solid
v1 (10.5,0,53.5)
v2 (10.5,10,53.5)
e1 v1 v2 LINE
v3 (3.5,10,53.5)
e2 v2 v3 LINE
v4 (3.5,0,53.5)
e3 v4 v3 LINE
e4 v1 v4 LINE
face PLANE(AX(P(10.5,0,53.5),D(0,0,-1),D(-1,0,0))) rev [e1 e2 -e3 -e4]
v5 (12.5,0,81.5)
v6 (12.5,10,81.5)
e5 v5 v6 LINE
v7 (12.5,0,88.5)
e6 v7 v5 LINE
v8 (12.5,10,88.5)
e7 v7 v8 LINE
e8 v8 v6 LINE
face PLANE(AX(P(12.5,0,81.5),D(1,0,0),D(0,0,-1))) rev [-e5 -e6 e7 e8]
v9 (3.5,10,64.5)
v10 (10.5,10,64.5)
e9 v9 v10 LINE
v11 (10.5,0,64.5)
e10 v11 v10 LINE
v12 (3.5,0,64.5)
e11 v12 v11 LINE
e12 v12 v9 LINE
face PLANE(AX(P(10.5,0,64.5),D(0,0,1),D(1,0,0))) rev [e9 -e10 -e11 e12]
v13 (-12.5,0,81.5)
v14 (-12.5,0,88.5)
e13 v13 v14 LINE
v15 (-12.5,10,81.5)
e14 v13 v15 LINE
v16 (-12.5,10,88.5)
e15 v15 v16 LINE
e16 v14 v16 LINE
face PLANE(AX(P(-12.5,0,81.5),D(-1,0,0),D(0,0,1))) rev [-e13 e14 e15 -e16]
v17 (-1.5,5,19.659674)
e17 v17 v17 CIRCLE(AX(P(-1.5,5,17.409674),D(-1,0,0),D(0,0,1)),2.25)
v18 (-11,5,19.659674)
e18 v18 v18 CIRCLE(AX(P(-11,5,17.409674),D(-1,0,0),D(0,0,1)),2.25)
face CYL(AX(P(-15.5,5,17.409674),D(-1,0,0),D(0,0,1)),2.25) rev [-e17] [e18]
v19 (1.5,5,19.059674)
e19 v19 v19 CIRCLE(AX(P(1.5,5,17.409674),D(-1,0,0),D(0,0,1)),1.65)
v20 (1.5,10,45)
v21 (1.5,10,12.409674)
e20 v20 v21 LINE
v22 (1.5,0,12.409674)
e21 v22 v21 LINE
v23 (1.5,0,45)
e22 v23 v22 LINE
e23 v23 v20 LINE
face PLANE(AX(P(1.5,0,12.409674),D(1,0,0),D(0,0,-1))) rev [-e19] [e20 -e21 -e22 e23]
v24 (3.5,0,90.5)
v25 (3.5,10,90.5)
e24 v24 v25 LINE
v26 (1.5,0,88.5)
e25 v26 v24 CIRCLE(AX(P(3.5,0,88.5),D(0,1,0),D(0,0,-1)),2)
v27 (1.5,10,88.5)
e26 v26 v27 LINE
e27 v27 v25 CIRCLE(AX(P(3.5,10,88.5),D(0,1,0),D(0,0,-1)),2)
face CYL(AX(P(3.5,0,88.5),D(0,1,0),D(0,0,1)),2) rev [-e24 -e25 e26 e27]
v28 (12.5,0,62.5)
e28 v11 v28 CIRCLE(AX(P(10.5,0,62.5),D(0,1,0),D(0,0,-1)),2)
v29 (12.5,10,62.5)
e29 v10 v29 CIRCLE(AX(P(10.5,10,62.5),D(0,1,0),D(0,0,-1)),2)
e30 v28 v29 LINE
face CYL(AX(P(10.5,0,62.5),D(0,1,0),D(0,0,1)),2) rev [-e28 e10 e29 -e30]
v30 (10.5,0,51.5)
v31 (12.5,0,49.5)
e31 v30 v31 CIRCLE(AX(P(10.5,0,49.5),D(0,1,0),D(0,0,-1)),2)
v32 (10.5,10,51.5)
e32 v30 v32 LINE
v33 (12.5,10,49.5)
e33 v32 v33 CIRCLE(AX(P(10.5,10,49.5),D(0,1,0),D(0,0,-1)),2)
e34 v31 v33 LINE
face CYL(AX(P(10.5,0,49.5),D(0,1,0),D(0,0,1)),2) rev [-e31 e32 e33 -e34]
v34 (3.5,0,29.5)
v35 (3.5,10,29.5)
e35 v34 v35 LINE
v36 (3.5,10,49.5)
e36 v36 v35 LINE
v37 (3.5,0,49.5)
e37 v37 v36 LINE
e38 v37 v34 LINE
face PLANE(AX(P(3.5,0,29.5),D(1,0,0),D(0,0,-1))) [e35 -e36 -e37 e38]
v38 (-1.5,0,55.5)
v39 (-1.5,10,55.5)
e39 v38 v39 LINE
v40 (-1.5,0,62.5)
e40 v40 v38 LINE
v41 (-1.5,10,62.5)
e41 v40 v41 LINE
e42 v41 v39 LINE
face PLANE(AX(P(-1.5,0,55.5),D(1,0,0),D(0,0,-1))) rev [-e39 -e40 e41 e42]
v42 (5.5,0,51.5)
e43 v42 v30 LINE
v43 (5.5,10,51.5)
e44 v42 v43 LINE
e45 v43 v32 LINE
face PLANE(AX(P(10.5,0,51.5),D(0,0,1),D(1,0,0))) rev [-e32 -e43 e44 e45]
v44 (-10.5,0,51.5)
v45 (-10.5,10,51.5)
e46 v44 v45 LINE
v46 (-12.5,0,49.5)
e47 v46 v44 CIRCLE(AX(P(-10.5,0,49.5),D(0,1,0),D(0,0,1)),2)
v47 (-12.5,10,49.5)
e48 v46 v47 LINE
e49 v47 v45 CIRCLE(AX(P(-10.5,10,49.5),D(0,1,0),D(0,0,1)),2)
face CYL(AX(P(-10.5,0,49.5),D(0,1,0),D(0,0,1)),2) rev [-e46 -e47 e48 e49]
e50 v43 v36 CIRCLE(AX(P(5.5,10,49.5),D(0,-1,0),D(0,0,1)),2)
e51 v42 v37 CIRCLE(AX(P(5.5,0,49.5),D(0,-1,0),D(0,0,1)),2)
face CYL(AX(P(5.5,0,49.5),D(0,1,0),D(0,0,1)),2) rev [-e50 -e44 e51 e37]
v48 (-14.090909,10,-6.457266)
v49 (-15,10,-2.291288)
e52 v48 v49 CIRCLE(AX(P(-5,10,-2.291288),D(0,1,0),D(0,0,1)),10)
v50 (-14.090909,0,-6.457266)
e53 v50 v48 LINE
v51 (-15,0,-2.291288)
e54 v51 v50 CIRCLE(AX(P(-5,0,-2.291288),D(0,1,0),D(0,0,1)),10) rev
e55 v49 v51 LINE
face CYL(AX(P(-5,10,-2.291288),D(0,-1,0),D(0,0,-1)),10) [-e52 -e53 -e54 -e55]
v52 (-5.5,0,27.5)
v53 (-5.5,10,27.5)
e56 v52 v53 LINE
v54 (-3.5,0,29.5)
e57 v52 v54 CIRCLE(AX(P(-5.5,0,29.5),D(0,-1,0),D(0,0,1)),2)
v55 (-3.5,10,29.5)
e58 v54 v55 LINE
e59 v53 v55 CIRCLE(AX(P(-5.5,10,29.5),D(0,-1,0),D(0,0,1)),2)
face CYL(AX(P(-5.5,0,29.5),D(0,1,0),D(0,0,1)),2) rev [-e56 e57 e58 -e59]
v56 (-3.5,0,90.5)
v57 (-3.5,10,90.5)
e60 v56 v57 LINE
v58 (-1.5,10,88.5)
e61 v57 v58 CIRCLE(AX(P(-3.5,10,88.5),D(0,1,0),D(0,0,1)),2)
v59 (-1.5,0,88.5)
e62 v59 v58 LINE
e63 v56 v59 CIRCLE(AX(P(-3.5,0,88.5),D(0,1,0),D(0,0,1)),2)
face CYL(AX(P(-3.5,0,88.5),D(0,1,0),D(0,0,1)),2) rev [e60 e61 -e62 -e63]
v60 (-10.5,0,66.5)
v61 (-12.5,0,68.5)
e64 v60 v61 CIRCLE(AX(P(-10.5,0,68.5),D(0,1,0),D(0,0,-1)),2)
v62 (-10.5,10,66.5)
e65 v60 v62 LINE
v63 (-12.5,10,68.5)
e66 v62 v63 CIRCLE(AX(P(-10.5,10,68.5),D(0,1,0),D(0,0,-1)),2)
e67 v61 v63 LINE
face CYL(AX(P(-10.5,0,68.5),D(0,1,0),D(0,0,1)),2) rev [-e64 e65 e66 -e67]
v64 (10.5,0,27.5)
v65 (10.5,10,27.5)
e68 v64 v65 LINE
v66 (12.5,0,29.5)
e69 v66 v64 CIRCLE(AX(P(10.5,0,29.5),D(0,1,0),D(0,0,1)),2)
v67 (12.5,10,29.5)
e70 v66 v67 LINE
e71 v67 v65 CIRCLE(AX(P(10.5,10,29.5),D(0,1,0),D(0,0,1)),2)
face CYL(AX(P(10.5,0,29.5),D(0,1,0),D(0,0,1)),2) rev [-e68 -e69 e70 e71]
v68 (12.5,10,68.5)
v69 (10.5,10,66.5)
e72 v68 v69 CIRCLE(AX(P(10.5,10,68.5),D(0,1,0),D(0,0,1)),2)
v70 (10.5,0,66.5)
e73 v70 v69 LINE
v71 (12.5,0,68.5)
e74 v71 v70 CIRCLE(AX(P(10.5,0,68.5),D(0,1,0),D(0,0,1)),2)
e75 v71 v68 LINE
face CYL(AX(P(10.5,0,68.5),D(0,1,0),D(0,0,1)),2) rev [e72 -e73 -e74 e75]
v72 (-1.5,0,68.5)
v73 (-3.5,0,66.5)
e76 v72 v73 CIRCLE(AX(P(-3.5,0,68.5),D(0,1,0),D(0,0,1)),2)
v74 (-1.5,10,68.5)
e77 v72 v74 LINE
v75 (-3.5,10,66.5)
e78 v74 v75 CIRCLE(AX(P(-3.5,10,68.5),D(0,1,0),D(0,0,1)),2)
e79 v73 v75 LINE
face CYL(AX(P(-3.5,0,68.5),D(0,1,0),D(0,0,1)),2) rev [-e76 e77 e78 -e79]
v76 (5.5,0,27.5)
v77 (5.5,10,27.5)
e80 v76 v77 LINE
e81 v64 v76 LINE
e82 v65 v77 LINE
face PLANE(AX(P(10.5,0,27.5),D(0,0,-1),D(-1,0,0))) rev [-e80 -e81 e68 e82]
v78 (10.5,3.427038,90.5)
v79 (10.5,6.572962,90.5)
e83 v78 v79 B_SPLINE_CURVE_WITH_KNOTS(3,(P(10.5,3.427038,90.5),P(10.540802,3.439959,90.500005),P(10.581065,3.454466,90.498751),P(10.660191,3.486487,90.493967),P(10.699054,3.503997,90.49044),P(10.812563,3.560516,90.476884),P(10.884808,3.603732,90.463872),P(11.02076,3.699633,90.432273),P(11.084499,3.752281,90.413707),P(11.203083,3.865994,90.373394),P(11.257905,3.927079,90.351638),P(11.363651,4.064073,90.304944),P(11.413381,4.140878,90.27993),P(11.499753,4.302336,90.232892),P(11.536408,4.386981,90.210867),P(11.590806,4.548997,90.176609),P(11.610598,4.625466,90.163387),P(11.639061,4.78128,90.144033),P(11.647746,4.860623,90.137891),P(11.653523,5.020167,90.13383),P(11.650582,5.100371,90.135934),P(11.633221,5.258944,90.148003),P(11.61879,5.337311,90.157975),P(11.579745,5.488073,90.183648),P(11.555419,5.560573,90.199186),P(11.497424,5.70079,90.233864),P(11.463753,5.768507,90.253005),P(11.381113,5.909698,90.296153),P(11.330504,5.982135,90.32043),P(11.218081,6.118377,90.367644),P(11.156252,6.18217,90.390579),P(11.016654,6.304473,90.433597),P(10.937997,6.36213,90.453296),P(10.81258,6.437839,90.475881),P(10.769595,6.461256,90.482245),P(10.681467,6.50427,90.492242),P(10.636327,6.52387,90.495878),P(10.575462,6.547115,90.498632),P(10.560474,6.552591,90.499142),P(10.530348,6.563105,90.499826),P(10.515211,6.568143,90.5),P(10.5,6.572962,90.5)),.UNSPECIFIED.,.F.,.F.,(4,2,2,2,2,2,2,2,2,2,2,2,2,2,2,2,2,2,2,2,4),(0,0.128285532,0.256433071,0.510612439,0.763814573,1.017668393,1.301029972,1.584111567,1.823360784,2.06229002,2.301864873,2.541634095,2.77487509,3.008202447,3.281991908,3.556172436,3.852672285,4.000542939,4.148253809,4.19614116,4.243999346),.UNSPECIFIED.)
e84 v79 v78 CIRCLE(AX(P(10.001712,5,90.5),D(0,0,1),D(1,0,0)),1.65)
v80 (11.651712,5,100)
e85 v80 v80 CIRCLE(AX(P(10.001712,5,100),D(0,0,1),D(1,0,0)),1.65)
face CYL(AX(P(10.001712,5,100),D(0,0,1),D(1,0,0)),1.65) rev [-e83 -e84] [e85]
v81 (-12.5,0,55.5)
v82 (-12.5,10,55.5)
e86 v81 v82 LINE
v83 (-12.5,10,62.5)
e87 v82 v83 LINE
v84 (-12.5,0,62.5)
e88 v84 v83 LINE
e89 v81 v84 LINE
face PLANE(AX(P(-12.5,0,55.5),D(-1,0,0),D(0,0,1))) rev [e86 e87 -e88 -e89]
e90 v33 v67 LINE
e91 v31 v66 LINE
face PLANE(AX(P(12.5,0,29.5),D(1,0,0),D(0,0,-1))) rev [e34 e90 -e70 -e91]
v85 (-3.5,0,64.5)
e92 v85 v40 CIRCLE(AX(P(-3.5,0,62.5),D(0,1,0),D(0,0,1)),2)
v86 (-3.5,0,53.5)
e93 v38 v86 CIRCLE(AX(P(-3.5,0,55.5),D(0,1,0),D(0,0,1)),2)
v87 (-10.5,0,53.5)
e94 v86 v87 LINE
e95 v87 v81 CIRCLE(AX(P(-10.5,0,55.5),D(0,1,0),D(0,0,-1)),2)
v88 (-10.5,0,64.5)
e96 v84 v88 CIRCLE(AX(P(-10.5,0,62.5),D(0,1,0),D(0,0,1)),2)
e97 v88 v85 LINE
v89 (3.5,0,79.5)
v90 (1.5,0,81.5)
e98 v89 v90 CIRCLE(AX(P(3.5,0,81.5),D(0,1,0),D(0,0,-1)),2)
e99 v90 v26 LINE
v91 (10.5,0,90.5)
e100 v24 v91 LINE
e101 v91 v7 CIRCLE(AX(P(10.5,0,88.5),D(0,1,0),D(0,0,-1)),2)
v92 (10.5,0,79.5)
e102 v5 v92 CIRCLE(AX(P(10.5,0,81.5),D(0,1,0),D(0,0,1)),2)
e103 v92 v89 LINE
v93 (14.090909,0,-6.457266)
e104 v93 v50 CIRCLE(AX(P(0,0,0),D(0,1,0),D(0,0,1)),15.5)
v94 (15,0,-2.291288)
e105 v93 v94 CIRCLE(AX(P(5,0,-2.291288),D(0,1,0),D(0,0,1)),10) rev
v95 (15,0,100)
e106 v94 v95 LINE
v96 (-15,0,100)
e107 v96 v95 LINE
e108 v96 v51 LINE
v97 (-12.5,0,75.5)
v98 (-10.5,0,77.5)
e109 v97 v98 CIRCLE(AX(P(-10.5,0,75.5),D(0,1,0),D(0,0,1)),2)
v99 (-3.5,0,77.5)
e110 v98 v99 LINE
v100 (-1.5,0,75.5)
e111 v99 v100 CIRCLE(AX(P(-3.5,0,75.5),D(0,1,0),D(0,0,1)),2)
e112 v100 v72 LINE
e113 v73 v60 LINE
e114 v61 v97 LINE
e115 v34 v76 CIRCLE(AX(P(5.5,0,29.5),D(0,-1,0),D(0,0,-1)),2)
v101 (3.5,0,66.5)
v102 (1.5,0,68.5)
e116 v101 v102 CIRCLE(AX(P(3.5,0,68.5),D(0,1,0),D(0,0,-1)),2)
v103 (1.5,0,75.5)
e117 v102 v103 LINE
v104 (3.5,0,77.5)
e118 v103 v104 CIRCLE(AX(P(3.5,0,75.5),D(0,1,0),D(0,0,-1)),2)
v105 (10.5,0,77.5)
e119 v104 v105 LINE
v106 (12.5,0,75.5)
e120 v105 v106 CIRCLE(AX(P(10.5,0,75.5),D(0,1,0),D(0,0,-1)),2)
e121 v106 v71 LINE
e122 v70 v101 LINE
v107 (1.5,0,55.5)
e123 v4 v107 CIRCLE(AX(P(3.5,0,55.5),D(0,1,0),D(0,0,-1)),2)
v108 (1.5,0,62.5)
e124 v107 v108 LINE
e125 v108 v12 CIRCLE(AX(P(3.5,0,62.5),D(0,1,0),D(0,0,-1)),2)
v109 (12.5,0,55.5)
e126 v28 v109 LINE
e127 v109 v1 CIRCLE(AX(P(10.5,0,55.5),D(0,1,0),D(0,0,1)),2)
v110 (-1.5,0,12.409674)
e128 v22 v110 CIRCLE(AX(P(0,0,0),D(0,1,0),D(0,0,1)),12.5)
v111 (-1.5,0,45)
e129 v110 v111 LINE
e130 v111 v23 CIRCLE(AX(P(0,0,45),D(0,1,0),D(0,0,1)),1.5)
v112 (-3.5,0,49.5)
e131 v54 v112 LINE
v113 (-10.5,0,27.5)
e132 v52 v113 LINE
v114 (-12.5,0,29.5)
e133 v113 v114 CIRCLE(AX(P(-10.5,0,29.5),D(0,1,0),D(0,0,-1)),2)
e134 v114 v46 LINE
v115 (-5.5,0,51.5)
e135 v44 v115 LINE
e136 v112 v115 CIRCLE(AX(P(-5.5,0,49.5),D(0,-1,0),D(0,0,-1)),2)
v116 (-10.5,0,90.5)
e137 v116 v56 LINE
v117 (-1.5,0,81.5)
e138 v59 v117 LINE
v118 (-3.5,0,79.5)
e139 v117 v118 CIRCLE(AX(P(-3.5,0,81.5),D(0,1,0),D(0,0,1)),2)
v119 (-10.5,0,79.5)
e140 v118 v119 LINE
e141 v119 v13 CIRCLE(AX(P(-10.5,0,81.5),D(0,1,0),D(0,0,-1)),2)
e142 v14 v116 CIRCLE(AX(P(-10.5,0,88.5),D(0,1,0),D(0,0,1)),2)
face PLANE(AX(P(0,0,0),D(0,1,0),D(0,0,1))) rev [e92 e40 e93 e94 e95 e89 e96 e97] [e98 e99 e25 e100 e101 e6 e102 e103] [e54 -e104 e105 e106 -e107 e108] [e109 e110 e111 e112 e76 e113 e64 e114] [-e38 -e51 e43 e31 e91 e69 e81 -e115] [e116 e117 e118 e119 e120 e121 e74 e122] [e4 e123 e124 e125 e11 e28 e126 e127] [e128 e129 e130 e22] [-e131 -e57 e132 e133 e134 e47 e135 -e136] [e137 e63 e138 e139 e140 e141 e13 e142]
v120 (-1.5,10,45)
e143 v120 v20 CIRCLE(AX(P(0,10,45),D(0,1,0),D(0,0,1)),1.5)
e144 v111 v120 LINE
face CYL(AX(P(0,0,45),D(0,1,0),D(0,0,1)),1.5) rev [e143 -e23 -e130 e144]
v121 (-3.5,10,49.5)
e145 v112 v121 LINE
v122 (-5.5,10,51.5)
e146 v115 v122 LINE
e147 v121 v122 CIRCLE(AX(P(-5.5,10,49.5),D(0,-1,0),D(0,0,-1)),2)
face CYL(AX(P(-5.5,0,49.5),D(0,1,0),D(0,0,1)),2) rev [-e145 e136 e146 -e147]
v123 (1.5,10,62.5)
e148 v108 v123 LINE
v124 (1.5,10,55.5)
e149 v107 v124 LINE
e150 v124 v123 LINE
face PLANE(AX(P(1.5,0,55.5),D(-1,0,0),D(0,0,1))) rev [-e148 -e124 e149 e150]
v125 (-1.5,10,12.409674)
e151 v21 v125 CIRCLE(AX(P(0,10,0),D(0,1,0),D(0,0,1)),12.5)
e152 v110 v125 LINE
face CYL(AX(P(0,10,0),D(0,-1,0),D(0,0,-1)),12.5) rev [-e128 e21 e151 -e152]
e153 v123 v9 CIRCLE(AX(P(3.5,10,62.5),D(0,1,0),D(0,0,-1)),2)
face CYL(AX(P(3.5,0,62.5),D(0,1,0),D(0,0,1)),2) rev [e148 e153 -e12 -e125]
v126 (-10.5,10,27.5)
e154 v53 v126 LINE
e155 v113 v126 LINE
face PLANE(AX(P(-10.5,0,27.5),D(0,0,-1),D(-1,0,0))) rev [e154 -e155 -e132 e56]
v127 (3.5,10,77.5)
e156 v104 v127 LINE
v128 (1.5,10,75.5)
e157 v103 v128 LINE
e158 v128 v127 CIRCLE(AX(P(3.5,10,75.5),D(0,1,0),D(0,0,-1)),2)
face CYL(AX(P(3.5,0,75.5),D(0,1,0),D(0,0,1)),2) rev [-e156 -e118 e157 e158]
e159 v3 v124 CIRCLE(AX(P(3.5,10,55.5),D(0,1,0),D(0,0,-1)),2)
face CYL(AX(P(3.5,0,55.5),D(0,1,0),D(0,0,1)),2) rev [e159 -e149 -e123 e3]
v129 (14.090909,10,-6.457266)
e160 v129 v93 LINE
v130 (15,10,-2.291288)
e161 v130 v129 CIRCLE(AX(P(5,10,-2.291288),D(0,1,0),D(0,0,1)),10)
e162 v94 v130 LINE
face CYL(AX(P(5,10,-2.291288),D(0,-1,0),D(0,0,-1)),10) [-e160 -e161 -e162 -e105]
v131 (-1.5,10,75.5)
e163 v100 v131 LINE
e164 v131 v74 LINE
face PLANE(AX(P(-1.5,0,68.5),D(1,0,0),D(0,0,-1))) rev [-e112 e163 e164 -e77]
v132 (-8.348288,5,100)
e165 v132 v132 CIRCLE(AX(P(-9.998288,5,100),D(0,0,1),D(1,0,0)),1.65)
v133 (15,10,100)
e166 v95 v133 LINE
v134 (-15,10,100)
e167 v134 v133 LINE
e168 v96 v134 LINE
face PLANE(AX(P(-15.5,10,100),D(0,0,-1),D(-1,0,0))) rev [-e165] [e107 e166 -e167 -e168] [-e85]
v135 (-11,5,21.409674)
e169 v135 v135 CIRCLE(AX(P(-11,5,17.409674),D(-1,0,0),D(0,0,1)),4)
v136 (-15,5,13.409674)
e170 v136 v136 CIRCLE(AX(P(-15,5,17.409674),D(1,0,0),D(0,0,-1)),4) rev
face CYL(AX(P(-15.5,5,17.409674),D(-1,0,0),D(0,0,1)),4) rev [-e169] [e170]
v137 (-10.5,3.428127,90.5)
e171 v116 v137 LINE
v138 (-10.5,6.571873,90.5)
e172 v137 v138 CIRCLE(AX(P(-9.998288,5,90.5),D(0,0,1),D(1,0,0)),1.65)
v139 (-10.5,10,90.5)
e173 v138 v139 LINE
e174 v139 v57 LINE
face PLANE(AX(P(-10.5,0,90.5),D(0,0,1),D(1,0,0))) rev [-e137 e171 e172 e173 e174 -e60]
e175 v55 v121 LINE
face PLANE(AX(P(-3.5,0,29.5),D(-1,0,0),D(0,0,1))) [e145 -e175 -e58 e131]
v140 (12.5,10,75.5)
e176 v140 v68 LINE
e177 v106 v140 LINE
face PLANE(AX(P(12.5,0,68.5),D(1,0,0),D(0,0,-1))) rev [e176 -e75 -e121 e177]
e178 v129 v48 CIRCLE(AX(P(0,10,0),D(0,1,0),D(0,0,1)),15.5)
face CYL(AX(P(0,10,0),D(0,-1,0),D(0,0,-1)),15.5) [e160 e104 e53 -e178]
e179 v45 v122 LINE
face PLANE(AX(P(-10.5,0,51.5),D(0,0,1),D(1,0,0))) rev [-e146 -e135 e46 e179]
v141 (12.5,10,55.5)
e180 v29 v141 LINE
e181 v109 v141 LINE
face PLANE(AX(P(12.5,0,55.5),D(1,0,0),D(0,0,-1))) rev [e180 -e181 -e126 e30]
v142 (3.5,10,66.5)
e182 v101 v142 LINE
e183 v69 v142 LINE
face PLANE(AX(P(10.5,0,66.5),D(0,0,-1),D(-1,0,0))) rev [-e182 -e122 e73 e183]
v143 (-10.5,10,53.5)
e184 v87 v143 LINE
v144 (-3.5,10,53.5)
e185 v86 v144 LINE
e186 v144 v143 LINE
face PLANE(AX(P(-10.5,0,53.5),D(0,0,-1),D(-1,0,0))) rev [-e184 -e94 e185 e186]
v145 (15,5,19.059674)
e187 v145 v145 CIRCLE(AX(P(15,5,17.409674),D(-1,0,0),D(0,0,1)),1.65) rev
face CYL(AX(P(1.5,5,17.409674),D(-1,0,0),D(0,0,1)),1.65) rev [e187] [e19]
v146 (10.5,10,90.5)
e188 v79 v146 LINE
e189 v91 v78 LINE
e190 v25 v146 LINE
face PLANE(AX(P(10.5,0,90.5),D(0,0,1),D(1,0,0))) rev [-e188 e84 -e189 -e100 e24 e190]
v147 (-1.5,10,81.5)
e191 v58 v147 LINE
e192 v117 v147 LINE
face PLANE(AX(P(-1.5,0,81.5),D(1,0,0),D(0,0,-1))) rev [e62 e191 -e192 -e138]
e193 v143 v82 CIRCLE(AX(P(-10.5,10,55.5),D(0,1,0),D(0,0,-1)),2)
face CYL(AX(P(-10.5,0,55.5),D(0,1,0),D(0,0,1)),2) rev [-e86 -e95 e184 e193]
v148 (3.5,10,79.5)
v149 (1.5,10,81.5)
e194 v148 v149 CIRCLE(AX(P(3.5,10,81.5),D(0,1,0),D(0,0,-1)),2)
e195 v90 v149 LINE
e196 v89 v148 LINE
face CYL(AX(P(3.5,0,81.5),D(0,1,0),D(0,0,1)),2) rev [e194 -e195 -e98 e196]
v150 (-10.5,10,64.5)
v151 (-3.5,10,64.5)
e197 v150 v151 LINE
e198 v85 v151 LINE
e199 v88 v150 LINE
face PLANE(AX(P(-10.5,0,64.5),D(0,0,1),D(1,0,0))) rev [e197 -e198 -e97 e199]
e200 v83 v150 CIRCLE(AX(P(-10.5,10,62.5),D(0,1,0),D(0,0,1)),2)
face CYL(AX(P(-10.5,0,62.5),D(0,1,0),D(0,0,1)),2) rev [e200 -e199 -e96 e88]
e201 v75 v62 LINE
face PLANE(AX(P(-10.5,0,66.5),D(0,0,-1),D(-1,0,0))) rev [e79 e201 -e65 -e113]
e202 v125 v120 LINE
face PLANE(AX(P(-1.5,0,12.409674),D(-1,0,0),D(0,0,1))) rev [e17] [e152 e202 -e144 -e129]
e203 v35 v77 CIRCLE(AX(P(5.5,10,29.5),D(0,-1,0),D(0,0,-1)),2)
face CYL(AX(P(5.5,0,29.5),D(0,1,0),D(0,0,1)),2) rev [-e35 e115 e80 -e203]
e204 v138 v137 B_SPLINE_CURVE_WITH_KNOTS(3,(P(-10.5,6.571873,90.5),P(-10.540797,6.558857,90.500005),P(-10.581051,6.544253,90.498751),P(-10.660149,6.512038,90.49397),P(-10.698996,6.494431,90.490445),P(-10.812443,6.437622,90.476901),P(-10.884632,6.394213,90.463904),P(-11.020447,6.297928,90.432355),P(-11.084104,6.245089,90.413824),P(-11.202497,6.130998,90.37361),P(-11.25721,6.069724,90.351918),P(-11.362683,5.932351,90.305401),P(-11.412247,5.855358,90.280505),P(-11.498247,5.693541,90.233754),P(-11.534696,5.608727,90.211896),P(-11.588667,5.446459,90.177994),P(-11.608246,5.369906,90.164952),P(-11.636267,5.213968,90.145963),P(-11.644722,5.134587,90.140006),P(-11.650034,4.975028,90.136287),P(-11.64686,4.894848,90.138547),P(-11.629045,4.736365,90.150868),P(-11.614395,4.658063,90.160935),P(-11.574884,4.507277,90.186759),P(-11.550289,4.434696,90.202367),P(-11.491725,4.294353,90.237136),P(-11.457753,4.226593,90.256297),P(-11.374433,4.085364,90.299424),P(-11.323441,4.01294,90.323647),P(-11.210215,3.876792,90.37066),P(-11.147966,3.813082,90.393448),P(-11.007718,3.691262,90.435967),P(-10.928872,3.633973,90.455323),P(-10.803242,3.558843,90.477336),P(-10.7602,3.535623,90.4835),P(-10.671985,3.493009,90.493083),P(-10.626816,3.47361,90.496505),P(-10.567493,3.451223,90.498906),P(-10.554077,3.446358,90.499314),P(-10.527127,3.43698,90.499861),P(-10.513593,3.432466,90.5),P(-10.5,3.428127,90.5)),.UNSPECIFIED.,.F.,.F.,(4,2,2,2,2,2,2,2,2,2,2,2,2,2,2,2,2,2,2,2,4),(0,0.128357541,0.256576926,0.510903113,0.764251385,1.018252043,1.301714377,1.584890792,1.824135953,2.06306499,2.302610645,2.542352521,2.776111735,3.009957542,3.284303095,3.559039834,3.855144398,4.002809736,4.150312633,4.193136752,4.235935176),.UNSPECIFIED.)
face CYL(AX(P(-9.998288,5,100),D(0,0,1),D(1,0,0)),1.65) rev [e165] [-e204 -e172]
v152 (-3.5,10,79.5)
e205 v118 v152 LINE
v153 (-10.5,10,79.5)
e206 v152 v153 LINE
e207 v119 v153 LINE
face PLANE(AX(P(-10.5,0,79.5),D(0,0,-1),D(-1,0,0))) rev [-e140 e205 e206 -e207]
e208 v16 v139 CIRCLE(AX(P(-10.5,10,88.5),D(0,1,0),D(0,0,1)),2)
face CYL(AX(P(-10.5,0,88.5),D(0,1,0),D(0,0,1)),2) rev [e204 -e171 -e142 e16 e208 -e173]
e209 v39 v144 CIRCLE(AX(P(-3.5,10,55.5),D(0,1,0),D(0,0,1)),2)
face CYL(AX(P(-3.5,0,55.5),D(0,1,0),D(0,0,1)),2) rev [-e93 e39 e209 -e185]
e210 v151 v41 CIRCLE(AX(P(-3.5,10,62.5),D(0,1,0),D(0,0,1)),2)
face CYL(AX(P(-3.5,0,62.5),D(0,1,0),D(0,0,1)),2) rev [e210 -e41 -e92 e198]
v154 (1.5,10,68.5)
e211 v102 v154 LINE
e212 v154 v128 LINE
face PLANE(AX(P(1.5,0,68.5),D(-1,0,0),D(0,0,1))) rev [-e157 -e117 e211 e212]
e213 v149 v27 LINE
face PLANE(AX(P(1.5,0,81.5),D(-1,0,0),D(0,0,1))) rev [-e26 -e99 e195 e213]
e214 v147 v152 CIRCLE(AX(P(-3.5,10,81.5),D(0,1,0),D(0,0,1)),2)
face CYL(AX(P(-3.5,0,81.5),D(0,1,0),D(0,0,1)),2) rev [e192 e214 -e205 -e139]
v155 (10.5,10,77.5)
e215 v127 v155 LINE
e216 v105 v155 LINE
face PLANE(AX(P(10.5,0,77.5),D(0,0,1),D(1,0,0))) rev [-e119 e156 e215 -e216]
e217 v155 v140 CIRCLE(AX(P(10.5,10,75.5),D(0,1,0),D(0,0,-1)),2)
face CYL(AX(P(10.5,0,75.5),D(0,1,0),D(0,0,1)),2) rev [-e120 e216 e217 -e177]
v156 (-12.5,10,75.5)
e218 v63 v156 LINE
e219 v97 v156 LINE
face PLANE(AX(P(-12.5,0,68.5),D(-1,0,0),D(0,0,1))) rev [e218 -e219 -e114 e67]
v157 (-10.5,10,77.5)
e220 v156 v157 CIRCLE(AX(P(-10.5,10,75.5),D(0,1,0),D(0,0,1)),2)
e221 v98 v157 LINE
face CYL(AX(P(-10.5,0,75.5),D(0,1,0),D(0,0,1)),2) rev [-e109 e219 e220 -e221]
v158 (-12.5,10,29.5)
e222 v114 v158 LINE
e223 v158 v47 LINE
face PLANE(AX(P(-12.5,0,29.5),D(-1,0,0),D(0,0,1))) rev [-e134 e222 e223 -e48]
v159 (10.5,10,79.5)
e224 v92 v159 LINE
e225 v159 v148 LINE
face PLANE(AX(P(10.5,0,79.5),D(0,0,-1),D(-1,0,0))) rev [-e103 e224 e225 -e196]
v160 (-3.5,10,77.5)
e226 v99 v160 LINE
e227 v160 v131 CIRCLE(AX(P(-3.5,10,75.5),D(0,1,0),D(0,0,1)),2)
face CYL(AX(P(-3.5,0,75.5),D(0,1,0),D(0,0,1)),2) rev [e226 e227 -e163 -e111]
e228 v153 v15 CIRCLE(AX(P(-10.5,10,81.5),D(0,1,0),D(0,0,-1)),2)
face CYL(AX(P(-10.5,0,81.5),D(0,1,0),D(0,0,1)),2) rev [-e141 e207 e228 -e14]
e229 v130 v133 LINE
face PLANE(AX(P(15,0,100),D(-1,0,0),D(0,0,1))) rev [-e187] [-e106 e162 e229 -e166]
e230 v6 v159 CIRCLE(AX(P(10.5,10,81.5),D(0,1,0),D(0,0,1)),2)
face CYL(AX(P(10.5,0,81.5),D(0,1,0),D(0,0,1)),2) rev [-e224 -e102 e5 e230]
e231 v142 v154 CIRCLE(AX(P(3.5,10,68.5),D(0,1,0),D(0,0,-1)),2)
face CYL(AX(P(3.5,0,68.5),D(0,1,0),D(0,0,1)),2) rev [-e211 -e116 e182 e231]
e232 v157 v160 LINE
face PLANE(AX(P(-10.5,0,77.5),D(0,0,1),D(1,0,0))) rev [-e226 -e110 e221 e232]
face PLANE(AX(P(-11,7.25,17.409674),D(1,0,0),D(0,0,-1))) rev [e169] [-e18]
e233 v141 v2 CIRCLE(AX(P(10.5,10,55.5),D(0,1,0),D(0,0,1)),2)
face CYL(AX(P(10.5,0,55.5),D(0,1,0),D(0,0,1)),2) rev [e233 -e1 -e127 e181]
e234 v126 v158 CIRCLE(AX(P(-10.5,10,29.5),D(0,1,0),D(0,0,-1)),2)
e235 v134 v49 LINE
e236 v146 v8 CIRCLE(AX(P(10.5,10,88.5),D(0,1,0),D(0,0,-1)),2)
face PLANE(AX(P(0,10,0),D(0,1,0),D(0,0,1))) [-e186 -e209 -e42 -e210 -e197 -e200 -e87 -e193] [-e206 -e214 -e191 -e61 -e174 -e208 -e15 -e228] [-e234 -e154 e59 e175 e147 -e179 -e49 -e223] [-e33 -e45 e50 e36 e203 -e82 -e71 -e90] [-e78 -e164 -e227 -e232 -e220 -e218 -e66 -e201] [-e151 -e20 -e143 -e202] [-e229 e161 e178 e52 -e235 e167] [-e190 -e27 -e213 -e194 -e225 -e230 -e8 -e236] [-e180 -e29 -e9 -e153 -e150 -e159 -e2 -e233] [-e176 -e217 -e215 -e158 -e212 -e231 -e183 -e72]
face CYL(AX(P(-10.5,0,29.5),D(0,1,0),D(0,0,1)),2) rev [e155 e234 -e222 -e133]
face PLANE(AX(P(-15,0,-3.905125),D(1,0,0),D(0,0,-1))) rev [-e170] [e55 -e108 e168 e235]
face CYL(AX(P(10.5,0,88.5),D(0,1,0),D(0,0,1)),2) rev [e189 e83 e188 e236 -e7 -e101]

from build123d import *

# Parameters (mm, degrees)
SKETCH_1_R                  = 12.5
EXTRUDE_1_DEPTH             = 10
CUT_EXTRUDE_5_DEPTH         = 102.687019821
SKETCH_8_W                  = 1.65
SKETCH_8_H                  = 14
HOLE_START                  = -16
HOLE_WIZARD_M41_OUTLINE_R   = 4
HOLE_WIZARD_M41_DEPTH       = 5
HOLE_START_2                = -11
HOLE_WIZARD_M41_2_OUTLINE_R = 2.25
HOLE_WIZARD_M41_2_DEPTH     = 9.5
CUT_EXTRUDE_START           = -10
CUT_EXTRUDE_6_DEPTH         = 10
FILLET_1_R                  = 10
CUT_EXTRUDE_7_DEPTH         = 102.612007273
EXTRUDE_2_DEPTH             = 10
CUT_EXTRUDE_8_DEPTH         = 102.612007273


with BuildPart() as part:
    # Эскиз1 → Бобышка-Вытянуть1 (new body)
    with BuildSketch(Plane(origin=(0, 0, 0), x_dir=(1, 0, 0), z_dir=(0, 1, 0))):
        with BuildLine():
            Line((-15.5, 0), (-15.5, -100))
            Line((-15.5, -100), (15.5, -100))
            Line((15.5, -100), (15.5, 0))
            ThreePointArc((15.5, 0), (0, 15.5), (-15.5, 0))
        make_face()
        with Locations(Location((0, 0, 0), (0, 0, 270))):
            Circle(SKETCH_1_R, mode=Mode.SUBTRACT)
    extrude(amount=EXTRUDE_1_DEPTH)

    # Эскиз6 → Вырез-Вытянуть5 (cut, through all)
    with BuildSketch(Plane(origin=(0, 10, 0), x_dir=(1, 0, 0), z_dir=(0, 1, 0))):
        with BuildLine():
            Line((-1.5, -12.409673646), (-1.5, -26))
            ThreePointArc((-1.5, -26), (0, -27.5), (1.5, -26))
            Line((1.5, -26), (1.5, -12.409673646))
            ThreePointArc((1.5, -12.409673646), (0, -12.5), (-1.5, -12.409673646))
        make_face()
        with BuildLine():
            Line((-1.5, -42.5), (-1.5, -49.5))
            ThreePointArc((-1.5, -49.5), (-2.085786438, -50.914213562), (-3.5, -51.5))
            Line((-3.5, -51.5), (-10.5, -51.5))
            ThreePointArc((-10.5, -51.5), (-11.914213562, -50.914213562), (-12.5, -49.5))
            Line((-12.5, -49.5), (-12.5, -42.5))
            ThreePointArc((-12.5, -42.5), (-11.914213562, -41.085786438), (-10.5, -40.5))
            Line((-10.5, -40.5), (-3.5, -40.5))
            ThreePointArc((-3.5, -40.5), (-2.085786438, -41.085786438), (-1.5, -42.5))
        make_face()
        with BuildLine():
            Line((-1.5, -55.5), (-1.5, -62.5))
            ThreePointArc((-1.5, -62.5), (-2.085786438, -63.914213562), (-3.5, -64.5))
            Line((-3.5, -64.5), (-10.5, -64.5))
            ThreePointArc((-10.5, -64.5), (-11.914213562, -63.914213562), (-12.5, -62.5))
            Line((-12.5, -62.5), (-12.5, -55.5))
            ThreePointArc((-12.5, -55.5), (-11.914213562, -54.085786438), (-10.5, -53.5))
            Line((-10.5, -53.5), (-3.5, -53.5))
            ThreePointArc((-3.5, -53.5), (-2.085786438, -54.085786438), (-1.5, -55.5))
        make_face()
        with BuildLine():
            Line((-1.5, -68.5), (-1.5, -75.5))
            ThreePointArc((-1.5, -75.5), (-2.085786438, -76.914213562), (-3.5, -77.5))
            Line((-3.5, -77.5), (-10.5, -77.5))
            ThreePointArc((-10.5, -77.5), (-11.914213562, -76.914213562), (-12.5, -75.5))
            Line((-12.5, -75.5), (-12.5, -68.5))
            ThreePointArc((-12.5, -68.5), (-11.914213562, -67.085786438), (-10.5, -66.5))
            Line((-10.5, -66.5), (-3.5, -66.5))
            ThreePointArc((-3.5, -66.5), (-2.085786438, -67.085786438), (-1.5, -68.5))
        make_face()
        with BuildLine():
            Line((-1.5, -81.5), (-1.5, -88.5))
            ThreePointArc((-1.5, -88.5), (-2.085786438, -89.914213562), (-3.5, -90.5))
            Line((-3.5, -90.5), (-10.5, -90.5))
            ThreePointArc((-10.5, -90.5), (-11.914213562, -89.914213562), (-12.5, -88.5))
            Line((-12.5, -88.5), (-12.5, -81.5))
            ThreePointArc((-12.5, -81.5), (-11.914213562, -80.085786438), (-10.5, -79.5))
            Line((-10.5, -79.5), (-3.5, -79.5))
            ThreePointArc((-3.5, -79.5), (-2.085786438, -80.085786438), (-1.5, -81.5))
        make_face()
        with BuildLine():
            Line((1.5, -29.5), (1.5, -36.5))
            ThreePointArc((1.5, -36.5), (2.085786438, -37.914213562), (3.5, -38.5))
            Line((3.5, -38.5), (10.5, -38.5))
            ThreePointArc((10.5, -38.5), (11.914213562, -37.914213562), (12.5, -36.5))
            Line((12.5, -36.5), (12.5, -29.5))
            ThreePointArc((12.5, -29.5), (11.914213562, -28.085786438), (10.5, -27.5))
            Line((10.5, -27.5), (3.5, -27.5))
            ThreePointArc((3.5, -27.5), (2.085786438, -28.085786438), (1.5, -29.5))
        make_face()
        with BuildLine():
            Line((-12.5, -29.5), (-12.5, -36.5))
            ThreePointArc((-12.5, -36.5), (-11.914213562, -37.914213562), (-10.5, -38.5))
            Line((-10.5, -38.5), (-3.5, -38.5))
            ThreePointArc((-3.5, -38.5), (-2.085786438, -37.914213562), (-1.5, -36.5))
            Line((-1.5, -36.5), (-1.5, -29.5))
            ThreePointArc((-1.5, -29.5), (-2.085786438, -28.085786438), (-3.5, -27.5))
            Line((-3.5, -27.5), (-10.5, -27.5))
            ThreePointArc((-10.5, -27.5), (-11.914213562, -28.085786438), (-12.5, -29.5))
        make_face()
        with BuildLine():
            Line((10.5, -79.5), (3.5, -79.5))
            ThreePointArc((3.5, -79.5), (2.085786438, -80.085786438), (1.5, -81.5))
            Line((1.5, -81.5), (1.5, -88.5))
            ThreePointArc((1.5, -88.5), (2.085786438, -89.914213562), (3.5, -90.5))
            Line((3.5, -90.5), (10.5, -90.5))
            ThreePointArc((10.5, -90.5), (11.914213562, -89.914213562), (12.5, -88.5))
            Line((12.5, -88.5), (12.5, -81.5))
            ThreePointArc((12.5, -81.5), (11.914213562, -80.085786438), (10.5, -79.5))
        make_face()
        with BuildLine():
            Line((10.5, -66.5), (3.5, -66.5))
            ThreePointArc((3.5, -66.5), (2.085786438, -67.085786438), (1.5, -68.5))
            Line((1.5, -68.5), (1.5, -75.5))
            ThreePointArc((1.5, -75.5), (2.085786438, -76.914213562), (3.5, -77.5))
            Line((3.5, -77.5), (10.5, -77.5))
            ThreePointArc((10.5, -77.5), (11.914213562, -76.914213562), (12.5, -75.5))
            Line((12.5, -75.5), (12.5, -68.5))
            ThreePointArc((12.5, -68.5), (11.914213562, -67.085786438), (10.5, -66.5))
        make_face()
        with BuildLine():
            Line((10.5, -53.5), (3.5, -53.5))
            ThreePointArc((3.5, -53.5), (2.085786438, -54.085786438), (1.5, -55.5))
            Line((1.5, -55.5), (1.5, -62.5))
            ThreePointArc((1.5, -62.5), (2.085786438, -63.914213562), (3.5, -64.5))
            Line((3.5, -64.5), (10.5, -64.5))
            ThreePointArc((10.5, -64.5), (11.914213562, -63.914213562), (12.5, -62.5))
            Line((12.5, -62.5), (12.5, -55.5))
            ThreePointArc((12.5, -55.5), (11.914213562, -54.085786438), (10.5, -53.5))
        make_face()
        with BuildLine():
            Line((10.5, -40.5), (3.5, -40.5))
            ThreePointArc((3.5, -40.5), (2.085786438, -41.085786438), (1.5, -42.5))
            Line((1.5, -42.5), (1.5, -49.5))
            ThreePointArc((1.5, -49.5), (2.085786438, -50.914213562), (3.5, -51.5))
            Line((3.5, -51.5), (10.5, -51.5))
            ThreePointArc((10.5, -51.5), (11.914213562, -50.914213562), (12.5, -49.5))
            Line((12.5, -49.5), (12.5, -42.5))
            ThreePointArc((12.5, -42.5), (11.914213562, -41.085786438), (10.5, -40.5))
        make_face()
    extrude(amount=-CUT_EXTRUDE_5_DEPTH, mode=Mode.SUBTRACT)

    # Эскиз8 → Отверстие обработанное метчиком M4x0.71 (revolve, cut)
    with BuildSketch(Plane(origin=(1.5, 5, 17.409673646), x_dir=(0, 0, 1), z_dir=(0, 1, 0))):
        with Locations((0.825, 7)):
            Rectangle(SKETCH_8_W, SKETCH_8_H)
    revolve(axis=Axis((-4.85, 5, 17.409673646), (1, 0, 0)), mode=Mode.SUBTRACT)

    # Цековка для винта с внутренним шестигранником M41: read off the stored shape, not the designer's step
    # Цековка для винта с внутренним шестигранником M41 outline → Цековка для винта с внутренним шестигранником M41 (cut)
    with BuildSketch(Plane.YZ.offset(HOLE_START)):
        with Locations((5, 17.409673646)):
            Circle(HOLE_WIZARD_M41_OUTLINE_R)
    extrude(amount=HOLE_WIZARD_M41_DEPTH, mode=Mode.SUBTRACT)

    # Hole Wizard M41 2 outline → Hole Wizard M41 2 (cut)
    with BuildSketch(Plane.YZ.offset(HOLE_START_2)):
        with Locations((5, 17.409673646)):
            Circle(HOLE_WIZARD_M41_2_OUTLINE_R)
    extrude(amount=HOLE_WIZARD_M41_2_DEPTH, mode=Mode.SUBTRACT)

    # Эскиз12 → Вырез-Вытянуть6 (cut)
    with BuildSketch(Plane(origin=(0, 10, 0), x_dir=(1, 0, 0), z_dir=(0, 1, 0)).offset(CUT_EXTRUDE_START)):
        with BuildLine():
            Line((-15, 3.905124838), (-15, -100))
            Line((-15, -100), (-15.5, -100))
            Line((-15.5, -100), (-15.5, 0))
            ThreePointArc((-15.5, 0), (-15.374491862, 1.968501969), (-15, 3.905124838))
        make_face()
        with BuildLine():
            Line((15, -100), (15, 3.905124838))
            ThreePointArc((15, 3.905124838), (15.374491862, 1.968501969), (15.5, 0))
            Line((15.5, 0), (15.5, -100))
            Line((15.5, -100), (15, -100))
        make_face()
    extrude(amount=CUT_EXTRUDE_6_DEPTH, mode=Mode.SUBTRACT)

    # Скругление1
    fillet_1_edges = [part.edges().sort_by_distance(p)[0] for p in [
        (15, 5, -3.905124838),
        (-15, 5, -3.905124838),
    ]]
    fillet(fillet_1_edges, radius=FILLET_1_R)

    # Отверстие обработанное метчиком M4x0.72: read off the stored shape, not the designer's step
    # Отверстие обработанное метчиком M4x0.72: loft between two sections, ruled curve by curve
    m4x0_72_from = [
        Edge.make_three_point_arc((11.651711547, 5, 90.135107967), (10.001711547, 6.65, 90.135107967), (8.351711547, 5, 90.135107967)),
        Edge.make_three_point_arc((8.351711547, 5, 90.135107967), (10.001711547, 3.35, 90.135107967), (11.651711547, 5, 90.135107967)),
    ]
    m4x0_72_to = [
        Edge.make_three_point_arc((11.651711547, 5, 100), (10.001711547, 6.65, 100), (8.351711547, 5, 100)),
        Edge.make_three_point_arc((8.351711547, 5, 100), (10.001711547, 3.35, 100), (11.651711547, 5, 100)),
    ]
    m4x0_72 = Solid(Shell([*[Face.make_surface_from_curves(m4x0_72_from[k], m4x0_72_to[k]) for k in range(2)], Face(Wire(m4x0_72_from)), Face(Wire(m4x0_72_to))]))
    add(m4x0_72, mode=Mode.SUBTRACT)

    # M4x0.72 2: loft between two sections, ruled curve by curve
    m4x0_72_2_from = [
        Edge.make_three_point_arc((-8.348288453, 5, 90.137351426), (-9.998288453, 6.65, 90.137351426), (-11.648288453, 5, 90.137351426)),
        Edge.make_three_point_arc((-11.648288453, 5, 90.137351426), (-9.998288453, 3.35, 90.137351426), (-8.348288453, 5, 90.137351426)),
    ]
    m4x0_72_2_to = [
        Edge.make_three_point_arc((-8.348288453, 5, 100), (-9.998288453, 6.65, 100), (-11.648288453, 5, 100)),
        Edge.make_three_point_arc((-11.648288453, 5, 100), (-9.998288453, 3.35, 100), (-8.348288453, 5, 100)),
    ]
    m4x0_72_2 = Solid(Shell([*[Face.make_surface_from_curves(m4x0_72_2_from[k], m4x0_72_2_to[k]) for k in range(2)], Face(Wire(m4x0_72_2_from)), Face(Wire(m4x0_72_2_to))]))
    add(m4x0_72_2, mode=Mode.SUBTRACT)

    # Эскиз16 → Вырез-Вытянуть7 (cut, through all)
    with BuildSketch(Plane(origin=(0, 10, 0), x_dir=(1, 0, 0), z_dir=(0, 1, 0))):
        with BuildLine():
            Line((1.5, -26), (1.5, -45))
            ThreePointArc((1.5, -45), (0, -46.5), (-1.5, -45))
            Line((-1.5, -45), (-1.5, -26))
            ThreePointArc((-1.5, -26), (0, -24.5), (1.5, -26))
        make_face()
    extrude(amount=-CUT_EXTRUDE_7_DEPTH, mode=Mode.SUBTRACT)

    # Эскиз17 → Бобышка-Вытянуть2 (add, through all)
    with BuildSketch(Plane(origin=(0, 10, 0), x_dir=(1, 0, 0), z_dir=(0, 1, 0))):
        with BuildLine():
            Line((-1.5, -29.5), (-1.5, -36.5))
            ThreePointArc((-1.5, -36.5), (-2.085786438, -37.914213562), (-3.5, -38.5))
            Line((-3.5, -38.5), (-5.5, -38.5))
            ThreePointArc((-5.5, -38.5), (-4.085786438, -37.914213562), (-3.5, -36.5))
            Line((-3.5, -36.5), (-3.5, -29.5))
            ThreePointArc((-3.5, -29.5), (-4.085786438, -28.085786438), (-5.5, -27.5))
            Line((-5.5, -27.5), (-3.5, -27.5))
            ThreePointArc((-3.5, -27.5), (-2.085786438, -28.085786438), (-1.5, -29.5))
        make_face()
        with BuildLine():
            Line((-1.5, -42.5), (-1.5, -49.5))
            ThreePointArc((-1.5, -49.5), (-2.085786438, -50.914213562), (-3.5, -51.5))
            Line((-3.5, -51.5), (-5.5, -51.5))
            ThreePointArc((-5.5, -51.5), (-4.085786438, -50.914213562), (-3.5, -49.5))
            Line((-3.5, -49.5), (-3.5, -42.5))
            ThreePointArc((-3.5, -42.5), (-4.085786438, -41.085786438), (-5.5, -40.5))
            Line((-5.5, -40.5), (-3.5, -40.5))
            ThreePointArc((-3.5, -40.5), (-2.085786438, -41.085786438), (-1.5, -42.5))
        make_face()
        with BuildLine():
            Line((5.5, -51.5), (3.5, -51.5))
            ThreePointArc((3.5, -51.5), (2.085786438, -50.914213562), (1.5, -49.5))
            Line((1.5, -49.5), (1.5, -42.5))
            ThreePointArc((1.5, -42.5), (2.085786438, -41.085786438), (3.5, -40.5))
            Line((3.5, -40.5), (5.5, -40.5))
            ThreePointArc((5.5, -40.5), (4.085786438, -41.085786438), (3.5, -42.5))
            Line((3.5, -42.5), (3.5, -49.5))
            ThreePointArc((3.5, -49.5), (4.085786438, -50.914213562), (5.5, -51.5))
        make_face()
        with BuildLine():
            Line((5.5, -38.5), (3.5, -38.5))
            ThreePointArc((3.5, -38.5), (2.085786438, -37.914213562), (1.5, -36.5))
            Line((1.5, -36.5), (1.5, -29.5))
            ThreePointArc((1.5, -29.5), (2.085786438, -28.085786438), (3.5, -27.5))
            Line((3.5, -27.5), (5.5, -27.5))
            ThreePointArc((5.5, -27.5), (4.085786438, -28.085786438), (3.5, -29.5))
            Line((3.5, -29.5), (3.5, -36.5))
            ThreePointArc((3.5, -36.5), (4.085786438, -37.914213562), (5.5, -38.5))
        make_face()
    extrude(amount=-EXTRUDE_2_DEPTH)

    # Эскиз18 → Вырез-Вытянуть8 (cut, through all)
    with BuildSketch(Plane(origin=(0, 10, 0), x_dir=(1, 0, 0), z_dir=(0, 1, 0))):
        with BuildLine():
            Line((-5.5, -27.5), (-10.5, -27.5))
            ThreePointArc((-10.5, -27.5), (-11.914213562, -28.085786438), (-12.5, -29.5))
            Line((-12.5, -29.5), (-12.5, -42.5))
            Line((-12.5, -42.5), (-12.5, -49.5))
            ThreePointArc((-12.5, -49.5), (-11.914213562, -50.914213562), (-10.5, -51.5))
            Line((-10.5, -51.5), (-5.5, -51.5))
            ThreePointArc((-5.5, -51.5), (-4.085786438, -50.914213562), (-3.5, -49.5))
            Line((-3.5, -49.5), (-3.5, -42.5))
            Line((-3.5, -42.5), (-3.5, -29.5))
            ThreePointArc((-3.5, -29.5), (-4.085786438, -28.085786438), (-5.5, -27.5))
        make_face()
        with BuildLine():
            Line((3.5, -29.5), (3.5, -42.5))
            Line((3.5, -42.5), (3.5, -49.5))
            ThreePointArc((3.5, -49.5), (4.085786438, -50.914213562), (5.5, -51.5))
            Line((5.5, -51.5), (10.5, -51.5))
            ThreePointArc((10.5, -51.5), (11.914213562, -50.914213562), (12.5, -49.5))
            Line((12.5, -49.5), (12.5, -42.5))
            Line((12.5, -42.5), (12.5, -29.5))
            ThreePointArc((12.5, -29.5), (11.914213562, -28.085786438), (10.5, -27.5))
            Line((10.5, -27.5), (5.5, -27.5))
            ThreePointArc((5.5, -27.5), (4.085786438, -28.085786438), (3.5, -29.5))
        make_face()
    extrude(amount=-CUT_EXTRUDE_8_DEPTH, mode=Mode.SUBTRACT)


solid = part.part
